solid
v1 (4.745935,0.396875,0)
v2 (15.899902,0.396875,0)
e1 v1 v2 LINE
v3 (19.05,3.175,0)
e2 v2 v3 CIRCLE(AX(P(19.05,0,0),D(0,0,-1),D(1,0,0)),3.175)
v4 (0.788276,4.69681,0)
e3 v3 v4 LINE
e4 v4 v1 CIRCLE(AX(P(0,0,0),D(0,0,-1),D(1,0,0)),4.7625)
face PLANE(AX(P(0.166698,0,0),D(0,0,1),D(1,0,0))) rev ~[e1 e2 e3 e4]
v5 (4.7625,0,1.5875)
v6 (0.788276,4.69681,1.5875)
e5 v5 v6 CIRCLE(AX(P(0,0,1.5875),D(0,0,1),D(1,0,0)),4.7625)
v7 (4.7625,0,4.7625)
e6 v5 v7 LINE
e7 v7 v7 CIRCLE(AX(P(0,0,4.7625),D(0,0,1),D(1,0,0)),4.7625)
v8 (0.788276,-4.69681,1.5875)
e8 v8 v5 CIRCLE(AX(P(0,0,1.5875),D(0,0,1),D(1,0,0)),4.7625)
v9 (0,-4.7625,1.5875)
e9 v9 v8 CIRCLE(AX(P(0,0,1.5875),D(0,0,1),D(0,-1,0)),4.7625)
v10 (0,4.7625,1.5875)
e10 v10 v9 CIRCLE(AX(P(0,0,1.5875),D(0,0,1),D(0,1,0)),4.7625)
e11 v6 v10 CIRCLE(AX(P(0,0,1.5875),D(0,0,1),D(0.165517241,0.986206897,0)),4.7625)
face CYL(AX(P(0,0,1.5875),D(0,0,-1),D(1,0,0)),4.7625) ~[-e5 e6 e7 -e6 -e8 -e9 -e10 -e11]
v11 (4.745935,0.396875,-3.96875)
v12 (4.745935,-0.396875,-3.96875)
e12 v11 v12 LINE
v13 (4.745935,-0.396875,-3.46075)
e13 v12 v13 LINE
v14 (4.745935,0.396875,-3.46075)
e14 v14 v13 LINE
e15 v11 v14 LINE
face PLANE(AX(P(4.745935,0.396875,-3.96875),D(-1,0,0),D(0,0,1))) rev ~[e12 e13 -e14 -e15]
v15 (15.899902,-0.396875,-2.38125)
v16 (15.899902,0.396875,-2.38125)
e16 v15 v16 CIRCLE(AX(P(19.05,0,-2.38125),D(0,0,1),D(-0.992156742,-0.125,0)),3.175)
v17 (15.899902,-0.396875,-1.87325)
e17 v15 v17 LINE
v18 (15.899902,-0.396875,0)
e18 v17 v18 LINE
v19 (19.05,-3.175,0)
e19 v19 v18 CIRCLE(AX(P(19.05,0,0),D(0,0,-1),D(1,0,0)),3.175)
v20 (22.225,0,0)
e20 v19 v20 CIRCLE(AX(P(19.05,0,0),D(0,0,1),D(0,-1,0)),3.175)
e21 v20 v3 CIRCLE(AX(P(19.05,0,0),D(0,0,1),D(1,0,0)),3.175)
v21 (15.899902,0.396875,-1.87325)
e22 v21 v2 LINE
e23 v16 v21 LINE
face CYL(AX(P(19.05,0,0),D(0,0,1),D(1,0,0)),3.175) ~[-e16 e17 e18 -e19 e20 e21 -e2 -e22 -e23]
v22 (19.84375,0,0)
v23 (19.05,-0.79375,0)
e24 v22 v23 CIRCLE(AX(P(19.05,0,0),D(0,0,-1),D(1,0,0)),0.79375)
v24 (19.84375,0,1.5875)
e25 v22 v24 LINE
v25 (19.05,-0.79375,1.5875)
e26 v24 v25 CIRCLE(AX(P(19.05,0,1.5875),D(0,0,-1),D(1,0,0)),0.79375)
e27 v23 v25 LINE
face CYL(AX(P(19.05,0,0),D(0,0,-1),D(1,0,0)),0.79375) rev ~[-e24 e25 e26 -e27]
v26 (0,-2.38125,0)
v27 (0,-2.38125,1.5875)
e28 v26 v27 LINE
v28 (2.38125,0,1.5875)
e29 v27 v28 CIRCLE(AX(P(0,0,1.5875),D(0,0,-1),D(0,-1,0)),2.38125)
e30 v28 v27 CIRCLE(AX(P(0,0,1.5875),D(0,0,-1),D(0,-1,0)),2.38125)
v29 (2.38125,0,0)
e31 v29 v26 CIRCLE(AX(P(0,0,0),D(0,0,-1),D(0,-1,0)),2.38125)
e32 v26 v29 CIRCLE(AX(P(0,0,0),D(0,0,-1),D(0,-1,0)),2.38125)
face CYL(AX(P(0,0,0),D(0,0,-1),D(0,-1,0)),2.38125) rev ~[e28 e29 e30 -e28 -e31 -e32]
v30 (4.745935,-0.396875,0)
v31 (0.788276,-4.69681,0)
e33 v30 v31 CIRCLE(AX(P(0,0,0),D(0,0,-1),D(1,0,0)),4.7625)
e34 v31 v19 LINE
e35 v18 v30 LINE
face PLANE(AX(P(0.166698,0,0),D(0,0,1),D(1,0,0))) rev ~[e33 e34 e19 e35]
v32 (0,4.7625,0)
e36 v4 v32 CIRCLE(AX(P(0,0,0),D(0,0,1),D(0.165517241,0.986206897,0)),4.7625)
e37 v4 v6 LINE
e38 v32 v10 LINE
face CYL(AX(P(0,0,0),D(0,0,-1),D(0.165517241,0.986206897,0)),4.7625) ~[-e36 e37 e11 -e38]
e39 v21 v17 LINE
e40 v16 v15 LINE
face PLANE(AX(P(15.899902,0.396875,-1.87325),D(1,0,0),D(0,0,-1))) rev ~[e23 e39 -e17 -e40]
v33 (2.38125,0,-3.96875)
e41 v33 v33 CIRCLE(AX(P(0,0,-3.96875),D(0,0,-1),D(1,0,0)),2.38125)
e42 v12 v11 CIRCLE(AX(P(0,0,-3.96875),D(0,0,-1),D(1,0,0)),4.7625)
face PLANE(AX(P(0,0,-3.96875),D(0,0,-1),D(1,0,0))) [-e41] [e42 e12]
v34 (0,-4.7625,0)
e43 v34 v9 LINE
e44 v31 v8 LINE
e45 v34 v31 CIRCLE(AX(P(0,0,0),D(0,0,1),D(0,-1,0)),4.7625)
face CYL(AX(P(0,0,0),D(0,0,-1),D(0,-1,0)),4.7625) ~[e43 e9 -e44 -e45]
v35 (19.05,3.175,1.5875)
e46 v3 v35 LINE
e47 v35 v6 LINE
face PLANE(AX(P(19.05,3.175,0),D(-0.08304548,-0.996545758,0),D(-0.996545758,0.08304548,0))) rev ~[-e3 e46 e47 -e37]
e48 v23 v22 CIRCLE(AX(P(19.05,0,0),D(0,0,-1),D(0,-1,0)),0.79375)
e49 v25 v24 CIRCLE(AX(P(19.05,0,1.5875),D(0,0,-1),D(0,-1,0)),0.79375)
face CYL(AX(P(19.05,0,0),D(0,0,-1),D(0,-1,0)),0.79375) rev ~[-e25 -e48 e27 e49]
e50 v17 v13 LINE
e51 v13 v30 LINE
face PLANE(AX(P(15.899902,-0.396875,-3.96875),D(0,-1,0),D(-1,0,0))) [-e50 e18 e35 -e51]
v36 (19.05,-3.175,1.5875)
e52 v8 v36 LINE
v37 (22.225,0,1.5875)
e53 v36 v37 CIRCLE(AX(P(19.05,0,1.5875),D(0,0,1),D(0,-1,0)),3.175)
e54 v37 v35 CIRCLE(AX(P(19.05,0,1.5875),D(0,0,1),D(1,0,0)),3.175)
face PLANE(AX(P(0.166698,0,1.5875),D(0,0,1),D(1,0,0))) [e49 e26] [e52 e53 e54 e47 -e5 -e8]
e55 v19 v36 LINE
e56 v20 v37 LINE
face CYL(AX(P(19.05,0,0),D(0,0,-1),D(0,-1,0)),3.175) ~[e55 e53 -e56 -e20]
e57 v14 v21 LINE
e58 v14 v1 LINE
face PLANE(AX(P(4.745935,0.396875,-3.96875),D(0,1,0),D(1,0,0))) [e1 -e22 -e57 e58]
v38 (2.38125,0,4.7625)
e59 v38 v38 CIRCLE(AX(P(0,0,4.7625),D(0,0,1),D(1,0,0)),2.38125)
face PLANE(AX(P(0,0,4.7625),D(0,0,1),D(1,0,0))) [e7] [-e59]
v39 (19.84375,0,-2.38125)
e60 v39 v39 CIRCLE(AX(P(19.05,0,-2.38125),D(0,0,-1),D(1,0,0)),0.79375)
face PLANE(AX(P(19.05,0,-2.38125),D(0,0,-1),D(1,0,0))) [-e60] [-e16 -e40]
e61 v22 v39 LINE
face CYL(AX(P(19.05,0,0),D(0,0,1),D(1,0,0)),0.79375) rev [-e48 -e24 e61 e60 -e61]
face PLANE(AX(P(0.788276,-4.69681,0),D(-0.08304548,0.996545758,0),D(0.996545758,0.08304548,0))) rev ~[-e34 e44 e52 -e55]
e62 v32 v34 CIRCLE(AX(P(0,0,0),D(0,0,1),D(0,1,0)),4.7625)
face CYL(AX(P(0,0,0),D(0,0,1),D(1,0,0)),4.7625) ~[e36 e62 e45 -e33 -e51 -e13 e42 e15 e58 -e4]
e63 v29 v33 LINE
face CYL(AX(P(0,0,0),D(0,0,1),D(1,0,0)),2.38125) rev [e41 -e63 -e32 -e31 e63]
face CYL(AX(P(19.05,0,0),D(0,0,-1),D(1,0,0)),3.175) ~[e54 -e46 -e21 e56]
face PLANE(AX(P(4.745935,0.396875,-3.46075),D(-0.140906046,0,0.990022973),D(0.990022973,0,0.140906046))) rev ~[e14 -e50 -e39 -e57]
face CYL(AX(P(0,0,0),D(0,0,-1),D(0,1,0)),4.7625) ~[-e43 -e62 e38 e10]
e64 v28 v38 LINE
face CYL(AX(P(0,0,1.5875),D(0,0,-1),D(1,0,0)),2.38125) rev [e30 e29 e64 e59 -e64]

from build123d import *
from build123d import SkipClean  # not in build123d's __all__

# Parameters (mm, degrees)
F1_DEPTH  = 1.5875
F2_R      = 4.7625
F2_R_2    = 2.38125
F3_DEPTH  = 3.175
F4_R      = 4.7625
F4_R_2    = 2.38125
F5_DEPTH  = 3.96875
F6_R      = 3.175
F6_R_2    = 0.79375
F7_DEPTH  = 2.38125
F9_DEPTH  = 3.96875
F11_DEPTH = 25.4


with BuildPart() as f1:
    # F0 (on Top) → F1 (new body)
    with BuildSketch(Plane.XY):
        with BuildLine():
            Line((0.7882758621, 4.6968103448), (0, 4.7625))
            ThreePointArc((0, 4.7625), (-4.7625, 0), (0, -4.7625))
            Line((0, -4.7625), (0.7882758621, -4.6968103448))
            ThreePointArc((0.7882758621, -4.6968103448), (3.6356271841, -3.076299925), (4.7625, 0))
            ThreePointArc((4.7625, 0), (3.6356271841, 3.076299925), (0.7882758621, 4.6968103448))
        make_face()
        with BuildLine():
            ThreePointArc((2.38125, 0), (1.6837980227, -1.6837980227), (0, -2.38125))
            ThreePointArc((0, -2.38125), (-1.6837980227, 1.6837980227), (2.38125, 0))
        make_face(mode=Mode.SUBTRACT)
        with BuildLine():
            ThreePointArc((0.7882758621, 4.6968103448), (0.3955040978, 4.7460491736), (0, 4.7625))
            Line((0, 4.7625), (0.7882758621, 4.6968103448))
        make_face()
        with BuildLine():
            Line((0.7882758621, -4.6968103448), (0, -4.7625))
            ThreePointArc((0, -4.7625), (0.3955040978, -4.7460491736), (0.7882758621, -4.6968103448))
        make_face()
        with BuildLine():
            Line((19.05, 3.175), (0.7882758621, 4.6968103448))
            ThreePointArc((0.7882758621, 4.6968103448), (3.6356271841, 3.076299925), (4.7625, 0))
            ThreePointArc((4.7625, 0), (3.6356271841, -3.076299925), (0.7882758621, -4.6968103448))
            Line((0.7882758621, -4.6968103448), (19.05, -3.175))
            ThreePointArc((19.05, -3.175), (15.875, 0), (19.05, 3.175))
        make_face()
        with BuildLine():
            ThreePointArc((22.225, 0), (21.2950640303, 2.2450640303), (19.05, 3.175))
            ThreePointArc((19.05, 3.175), (15.875, 0), (19.05, -3.175))
            ThreePointArc((19.05, -3.175), (21.2950640303, -2.2450640303), (22.225, 0))
        make_face()
        with BuildLine():
            ThreePointArc((19.84375, 0), (19.6112660076, -0.5612660076), (19.05, -0.79375))
            ThreePointArc((19.05, -0.79375), (18.4887339924, 0.5612660076), (19.84375, 0))
        make_face(mode=Mode.SUBTRACT)
    extrude(amount=F1_DEPTH)

    # F2 (on face) → F3 (join)
    with BuildSketch(Plane.XY.offset(1.5875)):
        Circle(F2_R)
        Circle(F2_R_2, mode=Mode.SUBTRACT)
    with SkipClean():  # cleaning this boolean's faces spoils the solid; the shape is the same uncleaned
        extrude(amount=F3_DEPTH)

    # F4 (on face) → F5 (join)
    with BuildSketch(Plane(origin=(0, 0, 0), x_dir=(1, 0, 0), z_dir=(0, 0, -1))):
        Circle(F4_R)
        Circle(F4_R_2, mode=Mode.SUBTRACT)
    extrude(amount=F5_DEPTH)

    # F6 (on face) → F7 (join)
    with BuildSketch(Plane(origin=(0, 0, 0), x_dir=(1, 0, 0), z_dir=(0, 0, -1))):
        with Locations((19.05, 0)):
            Circle(F6_R)
        with Locations((19.05, 0)):
            Circle(F6_R_2, mode=Mode.SUBTRACT)
    extrude(amount=F7_DEPTH)

    # F8 (on face) → F9 (join, through all)
    with BuildSketch(Plane(origin=(0, 0, -3.96875), x_dir=(1, 0, 0), z_dir=(0, 0, -1))):
        with BuildLine():
            ThreePointArc((4.7459347324, 0.396875), (4.758356881, 0.1986102803), (4.7625, 0))
            ThreePointArc((4.7625, 0), (4.758356881, -0.1986102803), (4.7459347324, -0.396875))
            Line((4.7459347324, -0.396875), (15.8999023453, -0.396875))
            ThreePointArc((15.8999023453, -0.396875), (15.875, 0), (15.8999023453, 0.396875))
            Line((15.8999023453, 0.396875), (4.7459347324, 0.396875))
        make_face()
    extrude(amount=-F9_DEPTH)

    # F10 (on face) → F11 (cut)
    with BuildSketch(Plane(origin=(0, 0.396875, 0), x_dir=(-1, 0, 0), z_dir=(0, 1, 0))):
        Polygon((-4.7459347324, -3.96875), (-4.7459347324, -3.46075), (-15.8999023453, -1.87325), (-15.8999023453, -2.38125), (-15.8999023453, -3.96875), align=None)
    extrude(amount=-F11_DEPTH, mode=Mode.SUBTRACT)


solid = f1.part
